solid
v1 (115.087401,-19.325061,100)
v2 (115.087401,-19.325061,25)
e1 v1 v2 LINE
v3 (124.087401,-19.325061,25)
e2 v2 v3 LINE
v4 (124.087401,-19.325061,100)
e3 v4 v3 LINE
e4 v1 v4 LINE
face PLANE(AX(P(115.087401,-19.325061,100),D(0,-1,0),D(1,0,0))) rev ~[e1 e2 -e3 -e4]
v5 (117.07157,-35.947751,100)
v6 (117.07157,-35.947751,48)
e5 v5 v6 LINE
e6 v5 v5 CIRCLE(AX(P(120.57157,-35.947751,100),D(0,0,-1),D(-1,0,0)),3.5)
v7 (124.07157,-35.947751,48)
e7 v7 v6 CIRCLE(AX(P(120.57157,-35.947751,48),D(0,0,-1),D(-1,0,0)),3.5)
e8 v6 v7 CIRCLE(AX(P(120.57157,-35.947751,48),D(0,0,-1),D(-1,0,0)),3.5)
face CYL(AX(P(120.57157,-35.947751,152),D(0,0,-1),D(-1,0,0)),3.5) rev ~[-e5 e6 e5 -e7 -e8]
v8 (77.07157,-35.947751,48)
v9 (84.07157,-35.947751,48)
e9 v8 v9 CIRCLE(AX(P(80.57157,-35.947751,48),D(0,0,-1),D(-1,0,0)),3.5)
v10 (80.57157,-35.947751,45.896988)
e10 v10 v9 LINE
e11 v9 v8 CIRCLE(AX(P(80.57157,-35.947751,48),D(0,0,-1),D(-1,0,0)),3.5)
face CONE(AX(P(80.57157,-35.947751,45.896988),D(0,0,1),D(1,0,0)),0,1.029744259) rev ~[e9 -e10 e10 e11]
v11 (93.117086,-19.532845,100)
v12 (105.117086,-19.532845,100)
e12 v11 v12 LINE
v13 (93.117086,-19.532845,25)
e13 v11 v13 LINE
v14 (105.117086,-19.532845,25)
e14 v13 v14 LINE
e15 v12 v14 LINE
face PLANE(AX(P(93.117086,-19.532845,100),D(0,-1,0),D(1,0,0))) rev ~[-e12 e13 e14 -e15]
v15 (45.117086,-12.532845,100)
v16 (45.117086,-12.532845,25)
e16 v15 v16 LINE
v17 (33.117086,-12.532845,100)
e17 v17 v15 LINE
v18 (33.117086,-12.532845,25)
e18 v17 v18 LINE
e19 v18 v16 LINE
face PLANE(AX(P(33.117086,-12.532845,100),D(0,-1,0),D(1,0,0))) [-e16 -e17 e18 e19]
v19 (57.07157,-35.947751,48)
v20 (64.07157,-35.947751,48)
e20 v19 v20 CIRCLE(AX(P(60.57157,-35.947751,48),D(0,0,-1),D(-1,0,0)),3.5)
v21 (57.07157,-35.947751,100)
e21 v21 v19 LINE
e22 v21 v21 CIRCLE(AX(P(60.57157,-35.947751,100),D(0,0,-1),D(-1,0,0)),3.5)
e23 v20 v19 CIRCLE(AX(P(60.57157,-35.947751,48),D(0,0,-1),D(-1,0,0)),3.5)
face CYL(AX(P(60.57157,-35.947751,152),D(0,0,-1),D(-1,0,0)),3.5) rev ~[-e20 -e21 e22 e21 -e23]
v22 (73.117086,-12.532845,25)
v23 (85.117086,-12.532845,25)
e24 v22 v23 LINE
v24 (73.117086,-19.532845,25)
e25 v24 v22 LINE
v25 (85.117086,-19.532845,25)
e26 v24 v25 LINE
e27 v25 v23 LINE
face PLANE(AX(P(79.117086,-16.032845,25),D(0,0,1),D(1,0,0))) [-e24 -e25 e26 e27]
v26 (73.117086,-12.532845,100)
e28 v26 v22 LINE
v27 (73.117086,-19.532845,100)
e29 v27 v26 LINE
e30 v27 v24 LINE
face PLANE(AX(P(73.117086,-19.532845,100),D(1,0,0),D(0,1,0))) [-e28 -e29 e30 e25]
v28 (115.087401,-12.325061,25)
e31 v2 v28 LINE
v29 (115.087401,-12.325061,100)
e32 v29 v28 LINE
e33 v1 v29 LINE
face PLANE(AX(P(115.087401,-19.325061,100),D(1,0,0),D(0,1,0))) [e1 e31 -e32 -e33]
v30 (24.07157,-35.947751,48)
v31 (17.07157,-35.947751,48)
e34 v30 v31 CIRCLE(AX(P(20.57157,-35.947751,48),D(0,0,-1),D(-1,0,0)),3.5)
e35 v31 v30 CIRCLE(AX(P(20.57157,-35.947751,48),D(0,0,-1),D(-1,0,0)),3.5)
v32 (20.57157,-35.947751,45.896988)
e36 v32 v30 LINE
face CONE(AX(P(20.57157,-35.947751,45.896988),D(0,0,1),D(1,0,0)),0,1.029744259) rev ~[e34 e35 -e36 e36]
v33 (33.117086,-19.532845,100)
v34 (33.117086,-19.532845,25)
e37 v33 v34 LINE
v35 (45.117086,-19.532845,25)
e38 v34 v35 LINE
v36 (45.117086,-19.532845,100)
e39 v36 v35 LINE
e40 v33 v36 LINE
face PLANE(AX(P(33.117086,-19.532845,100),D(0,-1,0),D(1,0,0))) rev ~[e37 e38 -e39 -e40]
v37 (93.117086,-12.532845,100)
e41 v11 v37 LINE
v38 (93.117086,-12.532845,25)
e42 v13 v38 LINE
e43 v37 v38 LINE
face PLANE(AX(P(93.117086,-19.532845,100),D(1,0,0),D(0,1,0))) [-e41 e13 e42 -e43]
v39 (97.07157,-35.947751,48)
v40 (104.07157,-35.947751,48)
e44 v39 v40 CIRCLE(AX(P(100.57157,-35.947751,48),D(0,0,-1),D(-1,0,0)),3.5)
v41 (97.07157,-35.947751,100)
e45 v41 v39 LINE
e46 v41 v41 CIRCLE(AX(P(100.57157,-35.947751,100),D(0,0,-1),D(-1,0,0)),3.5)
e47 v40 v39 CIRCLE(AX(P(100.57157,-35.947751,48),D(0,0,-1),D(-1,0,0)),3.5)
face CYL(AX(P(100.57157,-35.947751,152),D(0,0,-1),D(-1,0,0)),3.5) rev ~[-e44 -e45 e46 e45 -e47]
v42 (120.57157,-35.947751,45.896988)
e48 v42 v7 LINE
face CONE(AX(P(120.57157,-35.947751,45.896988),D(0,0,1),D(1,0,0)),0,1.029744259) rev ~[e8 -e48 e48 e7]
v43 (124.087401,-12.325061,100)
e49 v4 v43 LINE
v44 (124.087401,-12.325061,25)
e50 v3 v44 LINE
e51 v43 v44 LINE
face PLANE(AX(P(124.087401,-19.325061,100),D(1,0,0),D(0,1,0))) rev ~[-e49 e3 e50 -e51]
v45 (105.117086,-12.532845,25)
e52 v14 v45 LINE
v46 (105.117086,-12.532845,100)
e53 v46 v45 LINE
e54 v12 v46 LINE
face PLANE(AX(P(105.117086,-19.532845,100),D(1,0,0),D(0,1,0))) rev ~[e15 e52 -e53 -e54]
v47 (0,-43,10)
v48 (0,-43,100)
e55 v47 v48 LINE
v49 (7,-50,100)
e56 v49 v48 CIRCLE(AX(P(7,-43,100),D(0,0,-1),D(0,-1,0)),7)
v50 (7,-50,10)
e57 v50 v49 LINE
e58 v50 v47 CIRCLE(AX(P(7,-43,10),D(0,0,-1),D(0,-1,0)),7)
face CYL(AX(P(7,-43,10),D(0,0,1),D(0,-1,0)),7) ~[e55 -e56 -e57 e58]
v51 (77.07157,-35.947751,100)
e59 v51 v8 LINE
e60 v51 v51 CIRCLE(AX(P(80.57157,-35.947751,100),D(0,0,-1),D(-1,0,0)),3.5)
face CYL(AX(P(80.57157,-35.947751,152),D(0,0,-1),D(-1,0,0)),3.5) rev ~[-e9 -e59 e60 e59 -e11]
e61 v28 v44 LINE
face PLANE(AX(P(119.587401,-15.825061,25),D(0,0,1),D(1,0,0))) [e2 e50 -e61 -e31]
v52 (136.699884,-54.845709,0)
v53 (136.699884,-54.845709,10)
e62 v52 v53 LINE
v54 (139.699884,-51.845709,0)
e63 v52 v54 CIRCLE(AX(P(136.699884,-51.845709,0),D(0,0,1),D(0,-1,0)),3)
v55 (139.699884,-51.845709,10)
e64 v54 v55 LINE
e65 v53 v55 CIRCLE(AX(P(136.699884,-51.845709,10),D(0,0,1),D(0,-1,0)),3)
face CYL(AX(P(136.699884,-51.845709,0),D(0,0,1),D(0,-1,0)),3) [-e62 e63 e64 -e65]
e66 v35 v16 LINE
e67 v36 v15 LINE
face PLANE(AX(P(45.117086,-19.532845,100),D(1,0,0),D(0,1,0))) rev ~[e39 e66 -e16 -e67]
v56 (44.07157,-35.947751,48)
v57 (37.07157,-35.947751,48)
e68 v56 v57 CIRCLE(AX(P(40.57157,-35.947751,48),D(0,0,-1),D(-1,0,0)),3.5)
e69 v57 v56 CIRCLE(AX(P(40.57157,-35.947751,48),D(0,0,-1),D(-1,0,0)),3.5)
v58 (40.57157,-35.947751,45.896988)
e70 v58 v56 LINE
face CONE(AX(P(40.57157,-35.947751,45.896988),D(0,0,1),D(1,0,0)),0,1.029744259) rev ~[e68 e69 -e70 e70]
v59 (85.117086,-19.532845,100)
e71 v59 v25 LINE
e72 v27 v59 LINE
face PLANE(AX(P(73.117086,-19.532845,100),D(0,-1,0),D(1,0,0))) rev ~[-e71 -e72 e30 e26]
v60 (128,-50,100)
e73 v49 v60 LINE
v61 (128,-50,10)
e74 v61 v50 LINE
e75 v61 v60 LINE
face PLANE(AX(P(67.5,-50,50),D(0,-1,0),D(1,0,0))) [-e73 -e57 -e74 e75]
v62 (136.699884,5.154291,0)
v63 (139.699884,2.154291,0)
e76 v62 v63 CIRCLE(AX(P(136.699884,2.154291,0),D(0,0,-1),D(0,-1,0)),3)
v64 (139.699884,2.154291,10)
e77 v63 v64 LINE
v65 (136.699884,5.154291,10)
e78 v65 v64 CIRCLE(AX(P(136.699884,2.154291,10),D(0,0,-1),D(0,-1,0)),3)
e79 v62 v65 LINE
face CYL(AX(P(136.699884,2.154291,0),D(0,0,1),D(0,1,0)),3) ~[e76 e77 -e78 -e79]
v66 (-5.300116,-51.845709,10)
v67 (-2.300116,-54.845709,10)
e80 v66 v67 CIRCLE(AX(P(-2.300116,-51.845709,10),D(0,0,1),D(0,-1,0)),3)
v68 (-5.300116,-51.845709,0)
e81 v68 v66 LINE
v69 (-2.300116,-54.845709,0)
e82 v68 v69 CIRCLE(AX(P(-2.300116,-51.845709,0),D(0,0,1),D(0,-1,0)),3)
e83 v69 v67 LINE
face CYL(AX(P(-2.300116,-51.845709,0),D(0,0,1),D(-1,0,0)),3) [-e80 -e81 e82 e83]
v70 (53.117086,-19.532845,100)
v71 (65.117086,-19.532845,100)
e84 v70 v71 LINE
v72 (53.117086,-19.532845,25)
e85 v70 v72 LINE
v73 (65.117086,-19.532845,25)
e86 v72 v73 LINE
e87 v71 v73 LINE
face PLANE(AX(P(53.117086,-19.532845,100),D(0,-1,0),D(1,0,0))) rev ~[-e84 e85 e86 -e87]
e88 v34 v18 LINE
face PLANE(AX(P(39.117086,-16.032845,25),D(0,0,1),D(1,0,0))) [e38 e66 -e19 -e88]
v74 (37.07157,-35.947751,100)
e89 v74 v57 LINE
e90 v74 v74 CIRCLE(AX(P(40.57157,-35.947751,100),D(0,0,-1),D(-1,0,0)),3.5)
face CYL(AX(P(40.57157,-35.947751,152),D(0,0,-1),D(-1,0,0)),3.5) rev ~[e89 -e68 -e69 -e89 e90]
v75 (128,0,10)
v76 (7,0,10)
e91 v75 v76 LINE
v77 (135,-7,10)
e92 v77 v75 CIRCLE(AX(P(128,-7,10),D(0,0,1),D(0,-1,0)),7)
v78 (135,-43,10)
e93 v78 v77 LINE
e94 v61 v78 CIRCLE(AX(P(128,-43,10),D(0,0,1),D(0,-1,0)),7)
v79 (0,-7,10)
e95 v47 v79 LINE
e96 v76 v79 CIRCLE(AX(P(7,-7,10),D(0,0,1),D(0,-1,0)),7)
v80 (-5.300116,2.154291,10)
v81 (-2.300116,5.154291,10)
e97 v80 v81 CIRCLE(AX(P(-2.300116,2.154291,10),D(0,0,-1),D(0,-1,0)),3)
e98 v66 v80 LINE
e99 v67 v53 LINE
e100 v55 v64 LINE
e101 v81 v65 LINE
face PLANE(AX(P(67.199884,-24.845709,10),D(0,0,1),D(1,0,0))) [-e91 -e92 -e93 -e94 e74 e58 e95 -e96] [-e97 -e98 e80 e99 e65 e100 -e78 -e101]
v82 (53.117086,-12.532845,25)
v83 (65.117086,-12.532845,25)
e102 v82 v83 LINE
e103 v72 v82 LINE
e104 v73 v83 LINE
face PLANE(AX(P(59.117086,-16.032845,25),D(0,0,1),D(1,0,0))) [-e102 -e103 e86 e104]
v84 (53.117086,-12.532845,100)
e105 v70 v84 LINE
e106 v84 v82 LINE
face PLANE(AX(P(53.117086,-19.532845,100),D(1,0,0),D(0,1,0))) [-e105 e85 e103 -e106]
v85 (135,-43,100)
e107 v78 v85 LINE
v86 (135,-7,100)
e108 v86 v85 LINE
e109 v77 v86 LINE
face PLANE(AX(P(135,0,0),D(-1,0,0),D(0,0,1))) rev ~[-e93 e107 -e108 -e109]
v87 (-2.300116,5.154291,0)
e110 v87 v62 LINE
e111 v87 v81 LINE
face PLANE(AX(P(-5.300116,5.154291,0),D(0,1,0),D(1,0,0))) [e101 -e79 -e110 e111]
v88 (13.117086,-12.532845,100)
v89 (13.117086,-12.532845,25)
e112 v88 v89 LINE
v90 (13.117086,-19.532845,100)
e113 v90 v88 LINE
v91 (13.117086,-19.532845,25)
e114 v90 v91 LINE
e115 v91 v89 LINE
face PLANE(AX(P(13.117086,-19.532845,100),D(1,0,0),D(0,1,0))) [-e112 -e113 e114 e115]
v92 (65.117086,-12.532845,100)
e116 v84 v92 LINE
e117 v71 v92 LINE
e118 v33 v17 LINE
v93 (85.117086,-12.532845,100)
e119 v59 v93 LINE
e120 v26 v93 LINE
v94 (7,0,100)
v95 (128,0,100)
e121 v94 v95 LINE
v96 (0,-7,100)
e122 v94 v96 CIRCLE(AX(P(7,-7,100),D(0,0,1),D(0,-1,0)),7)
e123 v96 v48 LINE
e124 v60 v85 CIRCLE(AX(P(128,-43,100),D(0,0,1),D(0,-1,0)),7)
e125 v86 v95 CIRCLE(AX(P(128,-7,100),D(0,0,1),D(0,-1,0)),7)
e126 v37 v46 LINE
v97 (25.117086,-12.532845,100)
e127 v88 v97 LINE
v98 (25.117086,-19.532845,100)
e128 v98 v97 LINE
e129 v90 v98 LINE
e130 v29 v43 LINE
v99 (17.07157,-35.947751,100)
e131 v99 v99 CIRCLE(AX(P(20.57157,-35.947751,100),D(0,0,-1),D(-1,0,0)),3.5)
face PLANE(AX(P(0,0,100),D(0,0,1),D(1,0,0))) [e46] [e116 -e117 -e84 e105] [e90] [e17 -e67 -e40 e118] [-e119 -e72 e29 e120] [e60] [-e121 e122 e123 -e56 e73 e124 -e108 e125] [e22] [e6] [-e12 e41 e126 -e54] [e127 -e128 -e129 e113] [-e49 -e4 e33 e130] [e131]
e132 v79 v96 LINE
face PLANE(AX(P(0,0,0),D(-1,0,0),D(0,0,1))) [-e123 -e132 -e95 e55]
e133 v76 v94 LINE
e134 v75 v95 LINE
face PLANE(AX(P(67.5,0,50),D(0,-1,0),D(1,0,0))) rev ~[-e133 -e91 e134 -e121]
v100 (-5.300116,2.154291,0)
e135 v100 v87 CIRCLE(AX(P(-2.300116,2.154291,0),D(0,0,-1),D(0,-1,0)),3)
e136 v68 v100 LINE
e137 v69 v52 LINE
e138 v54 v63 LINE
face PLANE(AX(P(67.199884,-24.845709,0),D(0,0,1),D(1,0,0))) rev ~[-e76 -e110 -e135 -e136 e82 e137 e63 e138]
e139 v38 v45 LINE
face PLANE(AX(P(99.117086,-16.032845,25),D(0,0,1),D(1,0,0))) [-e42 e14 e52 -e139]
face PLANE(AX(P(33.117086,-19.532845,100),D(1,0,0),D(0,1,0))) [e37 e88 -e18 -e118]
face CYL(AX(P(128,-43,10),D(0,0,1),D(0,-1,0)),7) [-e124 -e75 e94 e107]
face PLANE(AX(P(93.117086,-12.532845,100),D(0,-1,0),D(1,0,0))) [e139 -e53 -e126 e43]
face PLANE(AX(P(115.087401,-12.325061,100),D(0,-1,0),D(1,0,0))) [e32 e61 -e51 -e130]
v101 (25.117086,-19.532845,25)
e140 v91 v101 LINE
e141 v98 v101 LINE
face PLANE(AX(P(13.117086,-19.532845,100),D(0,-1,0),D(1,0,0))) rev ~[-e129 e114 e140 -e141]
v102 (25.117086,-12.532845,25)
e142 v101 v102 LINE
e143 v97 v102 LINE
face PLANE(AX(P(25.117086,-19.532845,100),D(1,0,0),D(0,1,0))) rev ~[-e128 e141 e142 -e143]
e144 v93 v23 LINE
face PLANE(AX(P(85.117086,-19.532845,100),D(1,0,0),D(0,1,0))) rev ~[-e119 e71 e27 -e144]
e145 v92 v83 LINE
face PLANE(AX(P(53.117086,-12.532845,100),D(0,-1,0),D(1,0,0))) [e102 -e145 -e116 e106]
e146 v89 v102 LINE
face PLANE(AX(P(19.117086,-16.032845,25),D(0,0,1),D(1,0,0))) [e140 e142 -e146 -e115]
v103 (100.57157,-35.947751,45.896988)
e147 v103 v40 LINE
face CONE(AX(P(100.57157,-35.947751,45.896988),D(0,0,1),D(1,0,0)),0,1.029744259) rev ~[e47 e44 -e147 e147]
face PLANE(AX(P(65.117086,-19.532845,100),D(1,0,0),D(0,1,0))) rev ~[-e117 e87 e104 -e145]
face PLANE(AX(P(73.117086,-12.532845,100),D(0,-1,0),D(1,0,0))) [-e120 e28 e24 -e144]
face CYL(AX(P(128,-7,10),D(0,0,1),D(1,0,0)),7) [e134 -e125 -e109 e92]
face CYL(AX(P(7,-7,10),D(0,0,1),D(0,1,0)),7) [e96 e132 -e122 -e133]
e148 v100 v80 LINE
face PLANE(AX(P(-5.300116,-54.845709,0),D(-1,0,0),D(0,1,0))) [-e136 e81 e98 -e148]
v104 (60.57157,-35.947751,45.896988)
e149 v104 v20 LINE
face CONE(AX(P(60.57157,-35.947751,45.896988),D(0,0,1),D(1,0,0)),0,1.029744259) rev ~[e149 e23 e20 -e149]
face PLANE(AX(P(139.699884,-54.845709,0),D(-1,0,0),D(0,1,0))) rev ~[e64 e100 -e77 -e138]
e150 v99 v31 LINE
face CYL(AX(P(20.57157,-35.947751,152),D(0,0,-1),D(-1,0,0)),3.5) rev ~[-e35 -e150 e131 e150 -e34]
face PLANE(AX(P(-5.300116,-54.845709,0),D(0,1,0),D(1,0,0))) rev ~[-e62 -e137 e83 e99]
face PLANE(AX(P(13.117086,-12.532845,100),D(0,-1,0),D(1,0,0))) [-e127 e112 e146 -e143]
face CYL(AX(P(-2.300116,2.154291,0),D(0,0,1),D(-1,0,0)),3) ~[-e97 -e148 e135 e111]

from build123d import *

# Parameters (mm, degrees)
F0_W     = 135
F0_H     = 100
F1_DEPTH = 50
F2_W     = 12
F2_H     = 7
F2_W_2   = 9
F3_DEPTH = 75
F5_D     = 7
F5_DEPTH = 52
F5_TIP   = 2.1030121666
F6_W     = 145
F6_H     = 60
F7_DEPTH = 10
F8_R     = 7
F9_R     = 3


# Not quite as in the source:
# - a feature names something its author has since deleted; it is built from what else it names


with BuildPart() as f1:
    # F0 (on Front) → F1 (new body)
    with BuildSketch(Plane.XZ):
        with Locations((67.5, 50)):
            Rectangle(F0_W, F0_H)
    extrude(amount=F1_DEPTH)

    # F2 (on face) → F3 (cut)
    with BuildSketch(Plane.XY.offset(100)):
        with Locations((19.1170862466, -16.0328453556)):
            Rectangle(F2_W, F2_H)
        with Locations((39.1170862466, -16.0328453556)):
            Rectangle(F2_W, F2_H)
        with Locations((59.1170862466, -16.0328453556)):
            Rectangle(F2_W, F2_H)
        with Locations((79.1170862466, -16.0328453556)):
            Rectangle(F2_W, F2_H)
        with Locations((99.1170862466, -16.0328453556)):
            Rectangle(F2_W, F2_H)
        with Locations((119.5874011219, -15.8250607699)):
            Rectangle(F2_W_2, F2_H)
    extrude(amount=-F3_DEPTH, mode=Mode.SUBTRACT)

    # F5
    with Locations(Plane.XY.offset(100)):
        with Locations((20.5715699643, -35.9477512538), (40.5715699643, -35.9477512538), (60.5715699643, -35.9477512538), (80.5715699643, -35.9477512538), (100.5715699643, -35.9477512538), (120.5715699643, -35.9477512538)):
            Hole(F5_D / 2, depth=F5_DEPTH)
            with Locations((0, 0, -(F5_DEPTH + F5_TIP / 2))):  # 118° drill point
                Cone(0, F5_D / 2, F5_TIP, mode=Mode.SUBTRACT)

    # F6 (on Top) → F7 (join)
    with BuildSketch(Plane.XY):
        with Locations((67.1998835728, -24.8457092833)):
            Rectangle(F6_W, F6_H)
    extrude(amount=F7_DEPTH)

    # F8
    f8_edges = [f1.edges().sort_by_distance(p)[0] for p in [
        (0, -50, 55),
        (135, -50, 55),
        (135, 0, 55),
        (0, 0, 55),
    ]]
    fillet(f8_edges, radius=F8_R)

    # F9
    f9_edges = [f1.edges().sort_by_distance(p)[0] for p in [
        (-5.300116, 5.154291, 5),
        (-5.300116, -54.845709, 5),
        (139.699884, -54.845709, 5),
        (139.699884, 5.154291, 5),
    ]]
    fillet(f9_edges, radius=F9_R)


solid = f1.part
